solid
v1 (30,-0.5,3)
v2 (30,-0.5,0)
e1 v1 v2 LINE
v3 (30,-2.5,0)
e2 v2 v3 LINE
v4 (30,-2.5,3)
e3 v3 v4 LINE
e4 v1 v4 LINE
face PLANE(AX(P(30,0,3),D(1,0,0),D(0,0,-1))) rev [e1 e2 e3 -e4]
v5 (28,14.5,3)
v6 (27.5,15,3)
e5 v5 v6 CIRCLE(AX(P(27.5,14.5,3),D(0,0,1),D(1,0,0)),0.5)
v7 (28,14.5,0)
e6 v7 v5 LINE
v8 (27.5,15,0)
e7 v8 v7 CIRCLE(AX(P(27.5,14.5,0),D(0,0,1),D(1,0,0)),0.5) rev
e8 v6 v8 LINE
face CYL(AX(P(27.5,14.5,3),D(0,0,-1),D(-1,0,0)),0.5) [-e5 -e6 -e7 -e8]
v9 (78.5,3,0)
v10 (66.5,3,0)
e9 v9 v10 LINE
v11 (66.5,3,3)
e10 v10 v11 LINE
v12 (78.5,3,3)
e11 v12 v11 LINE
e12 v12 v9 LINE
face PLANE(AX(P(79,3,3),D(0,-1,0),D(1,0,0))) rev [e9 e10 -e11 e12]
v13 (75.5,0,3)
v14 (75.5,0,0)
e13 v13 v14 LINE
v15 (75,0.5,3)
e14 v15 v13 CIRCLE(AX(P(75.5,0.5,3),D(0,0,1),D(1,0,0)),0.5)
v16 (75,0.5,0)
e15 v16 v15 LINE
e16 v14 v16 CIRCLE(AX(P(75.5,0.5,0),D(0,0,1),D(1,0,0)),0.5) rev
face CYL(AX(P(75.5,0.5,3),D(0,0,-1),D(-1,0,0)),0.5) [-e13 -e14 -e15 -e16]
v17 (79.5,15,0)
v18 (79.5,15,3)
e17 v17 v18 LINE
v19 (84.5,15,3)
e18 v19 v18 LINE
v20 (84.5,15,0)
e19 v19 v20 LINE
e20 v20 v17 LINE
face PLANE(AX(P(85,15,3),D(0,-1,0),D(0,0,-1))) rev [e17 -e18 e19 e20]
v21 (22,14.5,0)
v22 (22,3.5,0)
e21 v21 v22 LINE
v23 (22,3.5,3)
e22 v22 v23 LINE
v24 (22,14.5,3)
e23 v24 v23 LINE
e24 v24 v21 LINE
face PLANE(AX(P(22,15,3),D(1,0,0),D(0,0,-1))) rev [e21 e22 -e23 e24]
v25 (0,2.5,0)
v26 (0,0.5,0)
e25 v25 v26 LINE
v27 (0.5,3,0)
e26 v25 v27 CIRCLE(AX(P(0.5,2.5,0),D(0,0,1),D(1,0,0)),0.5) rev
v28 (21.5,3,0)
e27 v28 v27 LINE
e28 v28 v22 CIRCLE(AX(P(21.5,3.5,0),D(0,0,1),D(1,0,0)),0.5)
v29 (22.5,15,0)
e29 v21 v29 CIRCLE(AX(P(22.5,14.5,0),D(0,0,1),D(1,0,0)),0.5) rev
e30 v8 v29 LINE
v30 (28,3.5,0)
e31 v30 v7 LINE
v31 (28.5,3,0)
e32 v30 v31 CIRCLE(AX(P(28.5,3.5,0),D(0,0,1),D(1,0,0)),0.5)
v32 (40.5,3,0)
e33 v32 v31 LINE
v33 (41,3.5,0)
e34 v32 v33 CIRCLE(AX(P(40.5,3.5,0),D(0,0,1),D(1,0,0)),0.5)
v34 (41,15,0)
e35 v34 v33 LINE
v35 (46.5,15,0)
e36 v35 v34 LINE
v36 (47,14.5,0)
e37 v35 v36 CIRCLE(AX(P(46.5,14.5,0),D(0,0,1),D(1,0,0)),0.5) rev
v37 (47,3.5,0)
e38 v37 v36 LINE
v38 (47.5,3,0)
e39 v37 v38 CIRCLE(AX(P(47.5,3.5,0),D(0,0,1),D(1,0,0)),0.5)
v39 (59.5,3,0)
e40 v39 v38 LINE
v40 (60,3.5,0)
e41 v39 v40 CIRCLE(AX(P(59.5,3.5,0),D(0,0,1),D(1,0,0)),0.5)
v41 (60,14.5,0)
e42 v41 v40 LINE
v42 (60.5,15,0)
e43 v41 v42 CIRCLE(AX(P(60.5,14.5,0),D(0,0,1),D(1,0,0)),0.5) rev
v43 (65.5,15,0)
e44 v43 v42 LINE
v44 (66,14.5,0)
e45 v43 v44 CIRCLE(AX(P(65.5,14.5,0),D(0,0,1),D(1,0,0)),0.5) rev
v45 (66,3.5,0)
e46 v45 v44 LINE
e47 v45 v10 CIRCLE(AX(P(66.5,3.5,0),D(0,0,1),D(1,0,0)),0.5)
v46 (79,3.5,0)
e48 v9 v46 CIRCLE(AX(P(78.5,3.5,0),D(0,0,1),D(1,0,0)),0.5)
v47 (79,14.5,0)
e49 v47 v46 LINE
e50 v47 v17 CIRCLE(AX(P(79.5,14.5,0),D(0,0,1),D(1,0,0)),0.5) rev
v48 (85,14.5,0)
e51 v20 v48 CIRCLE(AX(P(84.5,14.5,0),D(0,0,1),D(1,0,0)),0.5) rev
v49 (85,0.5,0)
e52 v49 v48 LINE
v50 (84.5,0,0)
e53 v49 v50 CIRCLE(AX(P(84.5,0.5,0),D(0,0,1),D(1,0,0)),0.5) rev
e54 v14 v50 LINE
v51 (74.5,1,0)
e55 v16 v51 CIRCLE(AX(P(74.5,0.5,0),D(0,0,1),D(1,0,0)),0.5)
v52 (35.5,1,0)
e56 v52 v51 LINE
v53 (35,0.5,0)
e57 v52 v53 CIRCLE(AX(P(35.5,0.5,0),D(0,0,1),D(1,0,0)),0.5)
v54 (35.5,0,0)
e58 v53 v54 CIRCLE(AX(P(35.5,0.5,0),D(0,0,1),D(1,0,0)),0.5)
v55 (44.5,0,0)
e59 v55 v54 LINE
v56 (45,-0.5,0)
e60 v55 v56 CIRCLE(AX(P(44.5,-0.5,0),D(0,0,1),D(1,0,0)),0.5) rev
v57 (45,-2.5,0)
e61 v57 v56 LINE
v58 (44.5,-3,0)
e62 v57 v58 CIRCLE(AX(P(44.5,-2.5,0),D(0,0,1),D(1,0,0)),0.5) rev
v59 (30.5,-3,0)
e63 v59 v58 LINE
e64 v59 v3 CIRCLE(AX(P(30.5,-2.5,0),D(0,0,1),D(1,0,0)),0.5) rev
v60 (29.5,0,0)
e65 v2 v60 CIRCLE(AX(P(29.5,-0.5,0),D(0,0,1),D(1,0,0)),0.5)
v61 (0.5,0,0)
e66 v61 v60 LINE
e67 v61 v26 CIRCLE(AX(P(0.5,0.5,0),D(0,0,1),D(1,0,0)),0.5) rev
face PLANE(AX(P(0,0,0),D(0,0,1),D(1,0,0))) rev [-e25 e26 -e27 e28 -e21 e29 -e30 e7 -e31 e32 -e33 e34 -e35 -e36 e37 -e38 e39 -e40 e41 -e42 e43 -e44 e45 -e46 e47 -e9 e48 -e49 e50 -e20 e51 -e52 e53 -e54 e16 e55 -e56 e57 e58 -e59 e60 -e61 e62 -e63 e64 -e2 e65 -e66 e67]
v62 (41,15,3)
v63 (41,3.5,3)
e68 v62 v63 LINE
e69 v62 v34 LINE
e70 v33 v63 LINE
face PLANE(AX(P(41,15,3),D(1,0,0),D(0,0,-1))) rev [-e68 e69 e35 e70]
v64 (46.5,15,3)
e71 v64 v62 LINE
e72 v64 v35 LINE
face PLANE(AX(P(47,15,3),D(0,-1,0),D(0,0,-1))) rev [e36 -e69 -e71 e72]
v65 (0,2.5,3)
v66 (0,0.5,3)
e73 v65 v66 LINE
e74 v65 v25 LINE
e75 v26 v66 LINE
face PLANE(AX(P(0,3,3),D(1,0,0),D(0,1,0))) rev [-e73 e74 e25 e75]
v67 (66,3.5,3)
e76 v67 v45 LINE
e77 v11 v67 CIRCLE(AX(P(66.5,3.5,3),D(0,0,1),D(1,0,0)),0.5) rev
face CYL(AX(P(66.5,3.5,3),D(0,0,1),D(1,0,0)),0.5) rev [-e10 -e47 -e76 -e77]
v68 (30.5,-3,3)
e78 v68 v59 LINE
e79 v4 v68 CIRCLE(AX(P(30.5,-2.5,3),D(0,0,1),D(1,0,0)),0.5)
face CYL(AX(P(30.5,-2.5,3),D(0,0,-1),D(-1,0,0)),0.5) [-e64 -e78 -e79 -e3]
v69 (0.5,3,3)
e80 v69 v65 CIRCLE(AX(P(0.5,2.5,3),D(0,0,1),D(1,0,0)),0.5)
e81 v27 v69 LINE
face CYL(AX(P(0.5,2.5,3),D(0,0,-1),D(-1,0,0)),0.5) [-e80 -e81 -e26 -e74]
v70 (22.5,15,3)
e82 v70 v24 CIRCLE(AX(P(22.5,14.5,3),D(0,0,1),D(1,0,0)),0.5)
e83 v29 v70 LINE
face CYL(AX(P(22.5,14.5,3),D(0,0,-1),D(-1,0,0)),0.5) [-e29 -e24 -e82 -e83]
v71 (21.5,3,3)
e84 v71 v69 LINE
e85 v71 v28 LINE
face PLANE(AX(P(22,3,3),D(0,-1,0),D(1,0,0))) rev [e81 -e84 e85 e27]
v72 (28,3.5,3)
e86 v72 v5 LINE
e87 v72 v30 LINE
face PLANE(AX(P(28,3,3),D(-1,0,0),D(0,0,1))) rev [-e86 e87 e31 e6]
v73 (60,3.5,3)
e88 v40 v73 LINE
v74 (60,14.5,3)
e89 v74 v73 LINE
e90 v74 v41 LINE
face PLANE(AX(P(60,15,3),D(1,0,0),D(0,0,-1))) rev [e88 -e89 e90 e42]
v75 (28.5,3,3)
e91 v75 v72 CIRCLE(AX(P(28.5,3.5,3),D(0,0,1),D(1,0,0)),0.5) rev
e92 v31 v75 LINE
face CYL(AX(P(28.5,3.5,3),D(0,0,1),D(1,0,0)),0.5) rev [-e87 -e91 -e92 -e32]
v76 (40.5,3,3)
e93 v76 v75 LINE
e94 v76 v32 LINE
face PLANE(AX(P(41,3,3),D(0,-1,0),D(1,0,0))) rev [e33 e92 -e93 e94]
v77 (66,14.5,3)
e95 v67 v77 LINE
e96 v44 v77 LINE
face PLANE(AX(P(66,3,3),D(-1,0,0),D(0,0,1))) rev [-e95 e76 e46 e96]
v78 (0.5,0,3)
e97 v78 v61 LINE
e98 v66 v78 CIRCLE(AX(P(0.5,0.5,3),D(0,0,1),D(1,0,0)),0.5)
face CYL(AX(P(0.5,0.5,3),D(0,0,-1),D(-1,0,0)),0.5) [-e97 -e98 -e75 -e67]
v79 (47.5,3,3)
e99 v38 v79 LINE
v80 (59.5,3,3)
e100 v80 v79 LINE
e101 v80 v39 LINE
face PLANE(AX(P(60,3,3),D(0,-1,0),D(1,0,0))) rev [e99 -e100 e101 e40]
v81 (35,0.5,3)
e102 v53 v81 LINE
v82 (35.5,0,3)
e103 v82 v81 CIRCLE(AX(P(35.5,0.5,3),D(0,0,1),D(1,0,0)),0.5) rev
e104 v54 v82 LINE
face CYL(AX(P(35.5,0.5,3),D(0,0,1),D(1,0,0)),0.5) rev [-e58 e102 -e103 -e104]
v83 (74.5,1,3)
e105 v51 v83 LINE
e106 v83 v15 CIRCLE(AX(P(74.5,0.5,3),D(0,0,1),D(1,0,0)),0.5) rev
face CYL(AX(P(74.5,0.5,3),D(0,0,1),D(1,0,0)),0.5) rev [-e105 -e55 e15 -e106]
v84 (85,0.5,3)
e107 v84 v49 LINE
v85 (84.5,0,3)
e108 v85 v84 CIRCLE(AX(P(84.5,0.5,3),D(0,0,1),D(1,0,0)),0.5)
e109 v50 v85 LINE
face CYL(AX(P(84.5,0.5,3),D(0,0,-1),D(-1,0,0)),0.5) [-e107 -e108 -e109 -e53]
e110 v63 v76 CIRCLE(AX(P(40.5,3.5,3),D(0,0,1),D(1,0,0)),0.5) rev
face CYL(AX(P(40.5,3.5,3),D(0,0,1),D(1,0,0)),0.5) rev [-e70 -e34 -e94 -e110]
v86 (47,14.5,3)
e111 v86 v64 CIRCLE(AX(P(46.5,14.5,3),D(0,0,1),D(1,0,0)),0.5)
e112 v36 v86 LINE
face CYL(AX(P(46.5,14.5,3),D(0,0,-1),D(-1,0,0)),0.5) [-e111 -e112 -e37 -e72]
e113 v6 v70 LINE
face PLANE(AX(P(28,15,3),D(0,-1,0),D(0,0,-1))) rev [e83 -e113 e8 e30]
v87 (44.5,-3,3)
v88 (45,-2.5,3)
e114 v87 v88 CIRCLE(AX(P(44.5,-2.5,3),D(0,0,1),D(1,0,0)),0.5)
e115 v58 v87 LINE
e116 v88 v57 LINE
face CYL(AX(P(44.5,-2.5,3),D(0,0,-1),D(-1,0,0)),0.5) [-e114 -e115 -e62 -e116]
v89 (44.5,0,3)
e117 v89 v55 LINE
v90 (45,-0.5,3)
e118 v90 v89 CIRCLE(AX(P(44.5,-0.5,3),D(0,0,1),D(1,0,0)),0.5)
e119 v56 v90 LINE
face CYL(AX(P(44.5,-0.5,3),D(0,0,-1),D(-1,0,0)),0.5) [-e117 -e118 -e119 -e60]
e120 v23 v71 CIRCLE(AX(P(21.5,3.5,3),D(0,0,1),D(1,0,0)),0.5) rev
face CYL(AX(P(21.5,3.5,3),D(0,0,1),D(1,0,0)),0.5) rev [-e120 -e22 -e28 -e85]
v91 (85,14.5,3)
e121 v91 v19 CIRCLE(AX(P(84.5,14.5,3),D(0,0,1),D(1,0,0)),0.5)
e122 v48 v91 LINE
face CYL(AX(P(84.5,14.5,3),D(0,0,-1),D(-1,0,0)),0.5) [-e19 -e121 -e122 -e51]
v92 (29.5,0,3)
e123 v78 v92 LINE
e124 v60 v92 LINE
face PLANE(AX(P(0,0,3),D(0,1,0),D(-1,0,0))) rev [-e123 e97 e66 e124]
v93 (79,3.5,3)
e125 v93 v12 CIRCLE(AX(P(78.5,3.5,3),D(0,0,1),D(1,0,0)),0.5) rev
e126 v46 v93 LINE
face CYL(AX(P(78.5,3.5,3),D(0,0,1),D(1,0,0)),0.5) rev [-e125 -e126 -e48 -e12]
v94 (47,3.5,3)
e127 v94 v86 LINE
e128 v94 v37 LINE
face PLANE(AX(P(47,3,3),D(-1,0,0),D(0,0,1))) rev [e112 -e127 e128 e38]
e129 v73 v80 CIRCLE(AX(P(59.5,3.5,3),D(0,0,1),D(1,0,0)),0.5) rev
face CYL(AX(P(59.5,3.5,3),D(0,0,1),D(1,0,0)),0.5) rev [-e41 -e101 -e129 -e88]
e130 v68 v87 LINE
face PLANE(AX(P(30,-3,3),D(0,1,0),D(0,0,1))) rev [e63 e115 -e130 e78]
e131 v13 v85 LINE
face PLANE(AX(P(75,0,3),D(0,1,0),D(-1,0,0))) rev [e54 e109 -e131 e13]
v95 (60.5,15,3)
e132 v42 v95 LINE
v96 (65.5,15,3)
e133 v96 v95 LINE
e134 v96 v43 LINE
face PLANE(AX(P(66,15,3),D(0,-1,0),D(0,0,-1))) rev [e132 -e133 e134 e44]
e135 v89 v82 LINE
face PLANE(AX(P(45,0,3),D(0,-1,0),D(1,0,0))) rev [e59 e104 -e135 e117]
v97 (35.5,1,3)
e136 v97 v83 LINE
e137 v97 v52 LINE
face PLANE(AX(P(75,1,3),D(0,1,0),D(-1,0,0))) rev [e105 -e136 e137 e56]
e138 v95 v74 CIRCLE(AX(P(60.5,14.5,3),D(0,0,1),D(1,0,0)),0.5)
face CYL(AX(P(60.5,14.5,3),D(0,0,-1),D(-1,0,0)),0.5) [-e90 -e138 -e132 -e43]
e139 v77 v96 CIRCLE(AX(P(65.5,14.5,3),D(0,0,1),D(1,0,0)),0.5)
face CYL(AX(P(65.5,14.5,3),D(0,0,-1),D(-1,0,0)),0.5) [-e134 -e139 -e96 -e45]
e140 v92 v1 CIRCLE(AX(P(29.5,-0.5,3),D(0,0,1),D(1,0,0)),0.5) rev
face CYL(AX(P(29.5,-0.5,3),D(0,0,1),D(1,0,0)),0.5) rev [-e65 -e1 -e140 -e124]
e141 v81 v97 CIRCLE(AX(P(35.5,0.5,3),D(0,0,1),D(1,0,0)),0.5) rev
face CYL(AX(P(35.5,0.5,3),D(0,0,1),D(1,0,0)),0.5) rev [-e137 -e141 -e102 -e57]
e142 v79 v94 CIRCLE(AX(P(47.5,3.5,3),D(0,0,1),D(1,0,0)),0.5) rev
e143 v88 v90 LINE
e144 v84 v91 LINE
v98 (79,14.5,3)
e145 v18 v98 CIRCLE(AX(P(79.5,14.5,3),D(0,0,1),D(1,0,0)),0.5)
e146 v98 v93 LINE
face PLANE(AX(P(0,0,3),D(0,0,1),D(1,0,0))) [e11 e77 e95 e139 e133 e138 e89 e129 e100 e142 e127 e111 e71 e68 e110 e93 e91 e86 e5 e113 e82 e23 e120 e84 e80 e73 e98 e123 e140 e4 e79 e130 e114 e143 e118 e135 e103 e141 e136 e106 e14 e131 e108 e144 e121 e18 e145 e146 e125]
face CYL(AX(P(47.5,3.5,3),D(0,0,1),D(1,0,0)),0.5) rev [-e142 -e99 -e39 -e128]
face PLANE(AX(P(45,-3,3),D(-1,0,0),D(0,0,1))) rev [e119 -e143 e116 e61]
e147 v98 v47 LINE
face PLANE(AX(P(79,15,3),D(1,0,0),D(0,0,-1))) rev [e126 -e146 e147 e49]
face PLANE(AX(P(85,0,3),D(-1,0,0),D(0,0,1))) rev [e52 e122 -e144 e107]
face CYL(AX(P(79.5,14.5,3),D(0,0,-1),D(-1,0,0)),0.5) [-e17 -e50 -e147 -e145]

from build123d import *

# Parameters (mm, degrees)
BOSS_EXTRUDE1_DEPTH = 3
FILLET1_R           = 0.5


with BuildPart() as part:
    # Sketch1 → Boss-Extrude1 (new body)
    with BuildSketch(Plane.XY):
        Polygon((0, 0), (30, 0), (30, -3), (45, -3), (45, 0), (35, 0), (35, 1), (75, 1), (75, 0), (85, 0), (85, 15), (79, 15), (79, 3), (66, 3), (66, 15), (60, 15), (60, 3), (47, 3), (47, 15), (41, 15), (41, 3), (28, 3), (28, 15), (22, 15), (22, 3), (0, 3), align=None)
    extrude(amount=BOSS_EXTRUDE1_DEPTH)

    # Fillet1
    fillet1_edges = [part.edges().sort_by_distance(p)[0] for p in [
        (22, 3, 1.5),
        (22, 15, 1.5),
        (28, 15, 1.5),
        (28, 3, 1.5),
        (41, 3, 1.5),
        (47, 15, 1.5),
        (47, 3, 1.5),
        (66, 3, 1.5),
        (60, 3, 1.5),
        (60, 15, 1.5),
        (66, 15, 1.5),
        (79, 3, 1.5),
        (79, 15, 1.5),
        (85, 15, 1.5),
        (85, 0, 1.5),
        (75, 1, 1.5),
        (75, 0, 1.5),
        (0, 3, 1.5),
        (0, 0, 1.5),
        (30, 0, 1.5),
        (30, -3, 1.5),
        (45, -3, 1.5),
        (45, 0, 1.5),
        (35, 0, 1.5),
        (35, 1, 1.5),
    ]]
    fillet(fillet1_edges, radius=FILLET1_R - 0.0001)  # a hair under: the kernel refuses the full size


solid = part.part
